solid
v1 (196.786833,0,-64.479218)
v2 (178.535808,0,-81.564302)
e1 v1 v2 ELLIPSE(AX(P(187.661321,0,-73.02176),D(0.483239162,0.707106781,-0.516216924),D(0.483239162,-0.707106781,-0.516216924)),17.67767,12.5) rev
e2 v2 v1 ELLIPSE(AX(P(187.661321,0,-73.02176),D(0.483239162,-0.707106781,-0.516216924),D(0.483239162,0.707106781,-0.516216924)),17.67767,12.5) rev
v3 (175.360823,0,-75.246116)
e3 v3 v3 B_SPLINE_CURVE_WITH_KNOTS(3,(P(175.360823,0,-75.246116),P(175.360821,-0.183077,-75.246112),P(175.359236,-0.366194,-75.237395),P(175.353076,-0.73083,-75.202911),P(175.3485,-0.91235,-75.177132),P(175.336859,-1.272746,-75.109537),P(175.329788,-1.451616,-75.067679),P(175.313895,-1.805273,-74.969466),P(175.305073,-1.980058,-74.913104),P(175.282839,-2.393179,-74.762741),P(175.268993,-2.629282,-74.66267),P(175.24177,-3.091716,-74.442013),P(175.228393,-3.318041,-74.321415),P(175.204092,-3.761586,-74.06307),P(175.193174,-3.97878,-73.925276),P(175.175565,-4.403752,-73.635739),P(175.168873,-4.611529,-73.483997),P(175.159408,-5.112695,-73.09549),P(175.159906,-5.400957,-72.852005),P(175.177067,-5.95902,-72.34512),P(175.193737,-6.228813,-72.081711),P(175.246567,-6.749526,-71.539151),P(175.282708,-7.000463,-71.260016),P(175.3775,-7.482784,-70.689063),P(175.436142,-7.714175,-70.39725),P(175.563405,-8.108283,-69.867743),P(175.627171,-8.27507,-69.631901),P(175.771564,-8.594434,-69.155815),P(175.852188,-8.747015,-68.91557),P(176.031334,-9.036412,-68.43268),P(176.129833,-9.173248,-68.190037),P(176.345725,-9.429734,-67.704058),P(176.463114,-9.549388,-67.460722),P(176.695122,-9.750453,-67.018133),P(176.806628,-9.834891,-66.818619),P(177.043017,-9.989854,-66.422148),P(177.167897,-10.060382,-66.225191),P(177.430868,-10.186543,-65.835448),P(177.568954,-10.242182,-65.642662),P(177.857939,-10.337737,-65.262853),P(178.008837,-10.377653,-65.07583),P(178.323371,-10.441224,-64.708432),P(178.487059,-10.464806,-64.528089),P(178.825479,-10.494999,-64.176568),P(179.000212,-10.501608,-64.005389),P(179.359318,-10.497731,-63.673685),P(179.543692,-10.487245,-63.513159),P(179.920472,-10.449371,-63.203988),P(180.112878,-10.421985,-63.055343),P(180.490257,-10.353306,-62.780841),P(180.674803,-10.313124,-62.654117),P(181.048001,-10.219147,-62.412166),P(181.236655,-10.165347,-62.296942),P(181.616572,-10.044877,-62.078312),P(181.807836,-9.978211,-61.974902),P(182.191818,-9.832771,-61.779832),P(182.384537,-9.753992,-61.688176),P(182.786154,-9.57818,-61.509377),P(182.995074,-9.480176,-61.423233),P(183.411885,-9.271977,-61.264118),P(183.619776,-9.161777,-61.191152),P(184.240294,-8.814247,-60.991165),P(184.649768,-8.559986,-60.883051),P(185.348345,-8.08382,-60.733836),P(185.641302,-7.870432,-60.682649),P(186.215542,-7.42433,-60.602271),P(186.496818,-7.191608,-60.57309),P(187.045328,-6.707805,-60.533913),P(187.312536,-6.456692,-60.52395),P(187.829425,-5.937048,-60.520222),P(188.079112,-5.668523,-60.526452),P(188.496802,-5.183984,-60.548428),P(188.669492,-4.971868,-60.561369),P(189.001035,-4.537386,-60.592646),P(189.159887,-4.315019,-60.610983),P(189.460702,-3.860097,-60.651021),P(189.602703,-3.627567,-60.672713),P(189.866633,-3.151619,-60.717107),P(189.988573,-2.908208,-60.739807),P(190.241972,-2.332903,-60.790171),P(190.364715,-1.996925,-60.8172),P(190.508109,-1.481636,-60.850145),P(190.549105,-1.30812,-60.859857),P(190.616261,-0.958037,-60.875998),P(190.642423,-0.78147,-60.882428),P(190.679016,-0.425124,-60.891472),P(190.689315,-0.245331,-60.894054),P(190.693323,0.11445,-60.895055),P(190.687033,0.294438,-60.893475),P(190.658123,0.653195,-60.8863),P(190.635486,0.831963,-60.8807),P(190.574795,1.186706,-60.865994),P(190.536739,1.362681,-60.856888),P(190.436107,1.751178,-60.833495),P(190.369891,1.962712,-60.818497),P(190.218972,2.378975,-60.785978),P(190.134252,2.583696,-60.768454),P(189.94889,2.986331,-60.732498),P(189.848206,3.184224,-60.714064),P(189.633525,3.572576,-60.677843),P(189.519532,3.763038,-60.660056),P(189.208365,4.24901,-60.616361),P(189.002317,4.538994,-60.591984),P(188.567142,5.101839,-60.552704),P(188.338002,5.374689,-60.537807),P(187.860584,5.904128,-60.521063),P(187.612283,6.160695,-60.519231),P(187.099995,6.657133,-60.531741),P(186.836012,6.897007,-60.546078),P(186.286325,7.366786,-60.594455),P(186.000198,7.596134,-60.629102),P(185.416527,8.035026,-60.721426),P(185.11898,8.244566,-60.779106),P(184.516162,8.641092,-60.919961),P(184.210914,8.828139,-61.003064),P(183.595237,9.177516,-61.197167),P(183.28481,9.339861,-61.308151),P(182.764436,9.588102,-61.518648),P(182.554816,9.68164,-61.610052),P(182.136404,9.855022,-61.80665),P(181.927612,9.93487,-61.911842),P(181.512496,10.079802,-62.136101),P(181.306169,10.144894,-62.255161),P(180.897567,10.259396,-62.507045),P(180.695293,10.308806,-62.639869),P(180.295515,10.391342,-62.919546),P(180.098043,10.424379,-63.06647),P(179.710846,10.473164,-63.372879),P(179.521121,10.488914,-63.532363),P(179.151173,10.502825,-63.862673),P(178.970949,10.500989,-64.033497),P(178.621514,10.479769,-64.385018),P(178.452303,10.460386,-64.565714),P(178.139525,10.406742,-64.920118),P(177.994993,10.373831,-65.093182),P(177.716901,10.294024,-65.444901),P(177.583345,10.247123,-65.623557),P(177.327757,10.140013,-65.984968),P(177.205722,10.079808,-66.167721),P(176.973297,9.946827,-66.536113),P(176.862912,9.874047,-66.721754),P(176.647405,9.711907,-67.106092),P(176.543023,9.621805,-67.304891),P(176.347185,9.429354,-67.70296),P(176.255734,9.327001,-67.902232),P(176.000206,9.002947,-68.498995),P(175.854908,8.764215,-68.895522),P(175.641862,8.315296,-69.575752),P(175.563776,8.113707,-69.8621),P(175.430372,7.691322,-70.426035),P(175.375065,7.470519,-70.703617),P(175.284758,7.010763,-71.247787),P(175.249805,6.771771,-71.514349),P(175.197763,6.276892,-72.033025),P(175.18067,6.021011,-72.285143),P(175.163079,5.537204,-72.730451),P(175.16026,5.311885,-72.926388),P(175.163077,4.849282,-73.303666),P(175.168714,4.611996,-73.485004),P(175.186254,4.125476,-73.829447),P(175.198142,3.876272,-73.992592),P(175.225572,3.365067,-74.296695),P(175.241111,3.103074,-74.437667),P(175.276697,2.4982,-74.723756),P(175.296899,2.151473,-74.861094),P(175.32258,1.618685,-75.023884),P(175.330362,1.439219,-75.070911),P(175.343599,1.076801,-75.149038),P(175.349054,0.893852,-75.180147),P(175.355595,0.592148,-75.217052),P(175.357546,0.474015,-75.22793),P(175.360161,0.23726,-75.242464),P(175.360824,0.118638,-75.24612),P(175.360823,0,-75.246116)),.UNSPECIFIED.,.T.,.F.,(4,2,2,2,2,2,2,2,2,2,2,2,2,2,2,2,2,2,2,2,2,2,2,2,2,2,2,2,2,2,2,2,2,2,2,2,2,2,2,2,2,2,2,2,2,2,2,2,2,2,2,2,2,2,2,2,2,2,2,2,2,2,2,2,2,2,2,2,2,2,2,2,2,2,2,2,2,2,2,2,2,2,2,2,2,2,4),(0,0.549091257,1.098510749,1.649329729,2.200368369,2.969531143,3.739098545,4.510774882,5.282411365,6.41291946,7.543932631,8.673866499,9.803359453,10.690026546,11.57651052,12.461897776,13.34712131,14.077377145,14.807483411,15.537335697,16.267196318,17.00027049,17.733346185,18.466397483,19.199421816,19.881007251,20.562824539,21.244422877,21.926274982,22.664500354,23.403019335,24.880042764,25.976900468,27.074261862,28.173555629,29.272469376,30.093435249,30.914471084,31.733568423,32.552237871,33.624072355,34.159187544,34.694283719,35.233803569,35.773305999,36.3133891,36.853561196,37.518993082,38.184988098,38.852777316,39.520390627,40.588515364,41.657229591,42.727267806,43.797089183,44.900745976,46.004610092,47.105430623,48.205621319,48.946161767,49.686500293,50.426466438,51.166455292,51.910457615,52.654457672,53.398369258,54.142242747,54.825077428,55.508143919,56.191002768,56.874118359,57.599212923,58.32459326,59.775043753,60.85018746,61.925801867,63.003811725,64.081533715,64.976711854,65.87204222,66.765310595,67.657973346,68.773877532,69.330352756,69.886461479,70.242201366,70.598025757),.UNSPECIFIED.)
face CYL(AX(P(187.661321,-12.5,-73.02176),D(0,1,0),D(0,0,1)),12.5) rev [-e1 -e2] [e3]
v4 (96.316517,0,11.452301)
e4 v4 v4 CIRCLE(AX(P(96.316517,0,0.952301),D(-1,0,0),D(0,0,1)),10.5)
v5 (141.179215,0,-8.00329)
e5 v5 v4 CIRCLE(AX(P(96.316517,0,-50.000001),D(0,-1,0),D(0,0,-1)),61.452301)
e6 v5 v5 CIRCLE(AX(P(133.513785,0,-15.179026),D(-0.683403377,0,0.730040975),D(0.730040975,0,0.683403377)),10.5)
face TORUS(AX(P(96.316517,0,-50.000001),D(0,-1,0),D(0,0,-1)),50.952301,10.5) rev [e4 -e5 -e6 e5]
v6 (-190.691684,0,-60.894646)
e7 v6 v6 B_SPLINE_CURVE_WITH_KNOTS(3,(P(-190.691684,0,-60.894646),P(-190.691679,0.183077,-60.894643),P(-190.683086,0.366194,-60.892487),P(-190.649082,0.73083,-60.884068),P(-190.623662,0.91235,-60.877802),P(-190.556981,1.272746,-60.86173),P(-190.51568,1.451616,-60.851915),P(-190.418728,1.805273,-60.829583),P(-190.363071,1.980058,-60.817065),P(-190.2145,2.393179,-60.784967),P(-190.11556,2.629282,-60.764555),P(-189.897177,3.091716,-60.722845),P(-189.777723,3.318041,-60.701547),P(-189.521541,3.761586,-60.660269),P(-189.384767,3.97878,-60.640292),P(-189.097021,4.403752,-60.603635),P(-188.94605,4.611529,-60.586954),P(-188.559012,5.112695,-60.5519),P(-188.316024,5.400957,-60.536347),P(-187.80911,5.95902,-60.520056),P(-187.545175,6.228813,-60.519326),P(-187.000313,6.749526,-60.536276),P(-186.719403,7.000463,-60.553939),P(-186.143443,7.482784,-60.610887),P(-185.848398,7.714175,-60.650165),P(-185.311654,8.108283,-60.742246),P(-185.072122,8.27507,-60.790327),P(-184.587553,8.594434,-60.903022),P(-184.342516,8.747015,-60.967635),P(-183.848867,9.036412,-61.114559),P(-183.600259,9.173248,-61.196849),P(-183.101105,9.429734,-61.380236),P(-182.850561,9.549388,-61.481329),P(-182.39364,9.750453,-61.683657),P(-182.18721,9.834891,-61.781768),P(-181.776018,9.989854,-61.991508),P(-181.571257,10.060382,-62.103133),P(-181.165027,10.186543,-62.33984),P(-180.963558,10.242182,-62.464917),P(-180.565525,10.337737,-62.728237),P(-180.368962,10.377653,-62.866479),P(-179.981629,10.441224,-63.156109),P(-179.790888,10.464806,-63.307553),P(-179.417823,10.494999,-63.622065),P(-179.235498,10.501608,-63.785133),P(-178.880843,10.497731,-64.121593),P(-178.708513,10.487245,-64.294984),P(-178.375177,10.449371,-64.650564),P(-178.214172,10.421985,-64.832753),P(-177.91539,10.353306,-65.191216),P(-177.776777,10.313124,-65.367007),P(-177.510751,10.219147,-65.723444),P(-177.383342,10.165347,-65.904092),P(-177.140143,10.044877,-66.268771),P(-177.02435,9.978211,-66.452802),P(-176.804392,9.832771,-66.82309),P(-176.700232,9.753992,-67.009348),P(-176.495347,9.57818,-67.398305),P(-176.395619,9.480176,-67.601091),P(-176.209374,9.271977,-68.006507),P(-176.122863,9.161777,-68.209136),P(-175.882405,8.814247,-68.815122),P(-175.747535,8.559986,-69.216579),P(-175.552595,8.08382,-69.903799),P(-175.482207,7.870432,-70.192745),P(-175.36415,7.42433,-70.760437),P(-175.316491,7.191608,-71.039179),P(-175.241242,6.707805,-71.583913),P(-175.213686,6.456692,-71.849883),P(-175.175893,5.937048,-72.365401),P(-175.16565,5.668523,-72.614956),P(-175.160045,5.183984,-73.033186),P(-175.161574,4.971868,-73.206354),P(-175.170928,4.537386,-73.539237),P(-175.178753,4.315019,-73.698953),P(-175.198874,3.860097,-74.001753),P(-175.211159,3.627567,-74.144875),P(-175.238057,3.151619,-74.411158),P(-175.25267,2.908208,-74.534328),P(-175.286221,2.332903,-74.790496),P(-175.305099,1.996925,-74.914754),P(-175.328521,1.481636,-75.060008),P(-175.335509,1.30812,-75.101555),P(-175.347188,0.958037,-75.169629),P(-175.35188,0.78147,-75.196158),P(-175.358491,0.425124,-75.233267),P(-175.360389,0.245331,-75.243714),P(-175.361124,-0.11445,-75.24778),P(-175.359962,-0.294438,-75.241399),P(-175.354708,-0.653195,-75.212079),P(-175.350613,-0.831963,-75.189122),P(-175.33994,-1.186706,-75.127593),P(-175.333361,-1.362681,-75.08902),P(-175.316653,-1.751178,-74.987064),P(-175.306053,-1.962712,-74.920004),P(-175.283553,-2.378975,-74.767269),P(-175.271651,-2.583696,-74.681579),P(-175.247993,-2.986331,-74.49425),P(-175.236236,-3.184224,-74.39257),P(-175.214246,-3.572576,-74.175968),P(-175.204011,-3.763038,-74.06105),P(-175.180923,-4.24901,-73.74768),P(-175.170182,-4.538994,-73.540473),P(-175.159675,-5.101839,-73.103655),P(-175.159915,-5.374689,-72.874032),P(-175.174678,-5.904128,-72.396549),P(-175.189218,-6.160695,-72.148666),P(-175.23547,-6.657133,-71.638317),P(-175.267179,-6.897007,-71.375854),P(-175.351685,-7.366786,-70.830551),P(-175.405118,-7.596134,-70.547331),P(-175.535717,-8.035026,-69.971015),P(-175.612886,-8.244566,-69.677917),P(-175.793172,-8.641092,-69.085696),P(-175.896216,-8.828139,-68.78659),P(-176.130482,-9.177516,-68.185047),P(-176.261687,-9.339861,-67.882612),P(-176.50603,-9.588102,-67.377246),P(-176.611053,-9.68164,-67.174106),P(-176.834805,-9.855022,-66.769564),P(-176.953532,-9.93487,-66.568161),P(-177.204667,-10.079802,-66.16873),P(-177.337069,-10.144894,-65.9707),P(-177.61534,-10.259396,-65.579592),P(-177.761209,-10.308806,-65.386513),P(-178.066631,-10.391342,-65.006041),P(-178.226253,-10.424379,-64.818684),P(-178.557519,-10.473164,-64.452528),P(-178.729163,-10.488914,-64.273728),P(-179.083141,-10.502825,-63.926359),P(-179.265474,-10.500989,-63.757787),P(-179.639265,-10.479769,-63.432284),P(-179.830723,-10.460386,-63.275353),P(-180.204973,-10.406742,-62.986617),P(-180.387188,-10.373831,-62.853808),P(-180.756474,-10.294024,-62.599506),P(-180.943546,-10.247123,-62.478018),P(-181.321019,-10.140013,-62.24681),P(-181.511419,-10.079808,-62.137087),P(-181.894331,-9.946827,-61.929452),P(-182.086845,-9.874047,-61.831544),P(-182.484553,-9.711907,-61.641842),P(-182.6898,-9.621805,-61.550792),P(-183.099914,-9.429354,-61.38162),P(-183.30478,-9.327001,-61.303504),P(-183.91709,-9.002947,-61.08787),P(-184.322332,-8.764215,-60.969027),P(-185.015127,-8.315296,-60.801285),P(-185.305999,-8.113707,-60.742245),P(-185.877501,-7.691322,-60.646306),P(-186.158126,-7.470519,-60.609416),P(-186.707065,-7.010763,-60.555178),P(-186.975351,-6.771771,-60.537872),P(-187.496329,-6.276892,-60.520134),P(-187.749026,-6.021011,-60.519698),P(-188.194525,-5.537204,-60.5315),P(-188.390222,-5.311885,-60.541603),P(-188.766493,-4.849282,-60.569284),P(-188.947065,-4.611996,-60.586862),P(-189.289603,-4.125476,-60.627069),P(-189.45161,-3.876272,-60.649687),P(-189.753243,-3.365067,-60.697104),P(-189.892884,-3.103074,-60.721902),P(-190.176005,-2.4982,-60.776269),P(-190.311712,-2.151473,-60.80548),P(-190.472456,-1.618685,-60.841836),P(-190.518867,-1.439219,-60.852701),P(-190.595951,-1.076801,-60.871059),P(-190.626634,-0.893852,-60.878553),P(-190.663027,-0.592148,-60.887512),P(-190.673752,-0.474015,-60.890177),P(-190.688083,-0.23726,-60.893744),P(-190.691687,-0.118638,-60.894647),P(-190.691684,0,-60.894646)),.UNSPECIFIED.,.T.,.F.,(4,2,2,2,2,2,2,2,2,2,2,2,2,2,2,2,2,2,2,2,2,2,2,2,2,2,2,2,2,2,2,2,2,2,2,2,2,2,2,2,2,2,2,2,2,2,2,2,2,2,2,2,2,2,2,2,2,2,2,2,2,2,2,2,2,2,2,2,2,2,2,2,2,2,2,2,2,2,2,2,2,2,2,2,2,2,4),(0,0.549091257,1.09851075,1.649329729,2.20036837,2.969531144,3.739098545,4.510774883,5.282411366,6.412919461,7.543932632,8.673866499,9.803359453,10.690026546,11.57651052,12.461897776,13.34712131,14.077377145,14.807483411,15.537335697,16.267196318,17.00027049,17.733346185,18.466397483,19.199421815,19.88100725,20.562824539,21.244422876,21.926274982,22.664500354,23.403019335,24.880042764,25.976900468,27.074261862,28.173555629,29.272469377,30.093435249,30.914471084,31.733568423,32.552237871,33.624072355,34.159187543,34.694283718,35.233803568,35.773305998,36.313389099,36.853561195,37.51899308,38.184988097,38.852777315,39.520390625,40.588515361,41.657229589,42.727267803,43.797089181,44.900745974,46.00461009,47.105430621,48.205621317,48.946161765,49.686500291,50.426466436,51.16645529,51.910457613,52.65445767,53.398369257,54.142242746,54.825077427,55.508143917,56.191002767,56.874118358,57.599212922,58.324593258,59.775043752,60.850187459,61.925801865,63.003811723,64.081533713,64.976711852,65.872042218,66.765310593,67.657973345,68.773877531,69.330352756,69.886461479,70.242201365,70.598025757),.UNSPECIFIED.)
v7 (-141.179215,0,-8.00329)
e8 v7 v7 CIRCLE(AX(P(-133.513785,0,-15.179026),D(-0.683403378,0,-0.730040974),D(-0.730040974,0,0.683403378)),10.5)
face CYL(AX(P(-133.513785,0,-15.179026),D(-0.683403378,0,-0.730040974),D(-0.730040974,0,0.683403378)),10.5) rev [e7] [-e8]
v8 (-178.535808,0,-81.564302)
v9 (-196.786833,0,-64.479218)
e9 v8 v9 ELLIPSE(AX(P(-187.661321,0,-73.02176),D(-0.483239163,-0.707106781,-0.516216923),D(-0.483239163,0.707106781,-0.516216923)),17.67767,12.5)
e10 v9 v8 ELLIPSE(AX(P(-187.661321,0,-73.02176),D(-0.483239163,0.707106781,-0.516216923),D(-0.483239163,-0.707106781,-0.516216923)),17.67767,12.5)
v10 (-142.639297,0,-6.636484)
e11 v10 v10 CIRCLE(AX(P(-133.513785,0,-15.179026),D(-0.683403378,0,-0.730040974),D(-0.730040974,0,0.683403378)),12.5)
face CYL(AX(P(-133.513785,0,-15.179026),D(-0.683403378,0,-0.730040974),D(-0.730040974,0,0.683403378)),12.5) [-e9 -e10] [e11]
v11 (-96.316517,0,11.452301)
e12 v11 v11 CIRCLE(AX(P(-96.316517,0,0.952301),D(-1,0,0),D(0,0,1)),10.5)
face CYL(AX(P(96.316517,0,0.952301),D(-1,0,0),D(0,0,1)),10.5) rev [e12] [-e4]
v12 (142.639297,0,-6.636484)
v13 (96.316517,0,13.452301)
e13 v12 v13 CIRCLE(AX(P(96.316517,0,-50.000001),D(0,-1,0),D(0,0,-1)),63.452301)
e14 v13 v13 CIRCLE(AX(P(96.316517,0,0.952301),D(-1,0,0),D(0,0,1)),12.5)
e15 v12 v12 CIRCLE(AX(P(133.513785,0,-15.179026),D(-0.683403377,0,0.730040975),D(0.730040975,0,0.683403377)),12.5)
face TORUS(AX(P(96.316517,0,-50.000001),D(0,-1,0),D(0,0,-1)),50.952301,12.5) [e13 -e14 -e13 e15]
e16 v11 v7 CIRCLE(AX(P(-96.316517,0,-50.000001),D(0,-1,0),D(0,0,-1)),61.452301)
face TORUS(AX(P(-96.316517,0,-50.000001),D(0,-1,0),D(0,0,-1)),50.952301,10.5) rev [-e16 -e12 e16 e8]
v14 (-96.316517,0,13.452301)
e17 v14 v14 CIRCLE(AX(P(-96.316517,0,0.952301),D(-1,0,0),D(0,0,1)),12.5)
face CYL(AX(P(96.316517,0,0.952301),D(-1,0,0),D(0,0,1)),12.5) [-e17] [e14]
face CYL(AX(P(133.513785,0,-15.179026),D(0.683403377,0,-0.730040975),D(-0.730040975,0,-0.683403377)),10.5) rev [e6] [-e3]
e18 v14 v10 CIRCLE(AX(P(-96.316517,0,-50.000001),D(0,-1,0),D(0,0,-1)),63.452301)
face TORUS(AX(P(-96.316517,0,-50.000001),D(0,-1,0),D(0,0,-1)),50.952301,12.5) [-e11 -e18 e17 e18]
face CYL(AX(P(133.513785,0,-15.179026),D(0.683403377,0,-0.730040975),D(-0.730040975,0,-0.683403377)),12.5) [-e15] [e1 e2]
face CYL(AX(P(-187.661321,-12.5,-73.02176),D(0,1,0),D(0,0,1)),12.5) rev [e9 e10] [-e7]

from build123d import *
from build123d.topology import SkipClean

# Parameters (mm, degrees)
SKETCH_4_R          = 12.5
SKETCH_4_R_2        = 10.5
CUT_EXTRUDE_START   = -12.5000001
CUT_EXTRUDE_1_DEPTH = 25.0000001


# Read off the part's stored shape, not the designer's step: Вырез-Вытянуть1
with BuildPart() as part:
    # По траектории2: sweep along a path in Эскиз1
    with BuildLine(Plane(origin=(0, 0, 0), x_dir=(1, 0, 0), z_dir=(0, 1, 0))) as sweep_2_path:
        Line((-186.966101695, 73.672565631), (-132.818565926, 15.829831696))
        ThreePointArc((-132.818565926, 15.829831696), (-116.209877383, 4.127849745), (-96.316517235, 5.78e-07))
        Line((-96.316517235, 5.78e-07), (96.316517396, 5.78e-07))
        ThreePointArc((96.316517396, 5.78e-07), (116.209877578, 4.12784976), (132.818566138, 15.829831751))
        Line((132.818566138, 15.829831751), (186.966101695, 73.672565631))
    # Эскиз4 → По траектории2 (sweep)
    with BuildSketch(Plane(origin=(186.966101695, 0, -73.672565631), x_dir=(0.7300409748240902, 0, 0.6834033765485009), z_dir=(-0.6834033765485009, 0, 0.7300409748240902))):
        with Locations((0.952301131, 0)):
            Circle(SKETCH_4_R)
        with Locations((0.952301131, 0)):
            Circle(SKETCH_4_R_2, mode=Mode.SUBTRACT)
    sweep(path=sweep_2_path.line)

    # Вырез-Вытянуть1 outline → Вырез-Вытянуть1 (cut)
    with SkipClean():  # the faces are left unmerged after this step: merging them gives an invalid solid
        with BuildSketch(Plane(origin=(0, 0, 0), x_dir=(1, 0, 0), z_dir=(0, 1, 0)).offset(CUT_EXTRUDE_START)):
            with BuildLine():
                Line((196.786832727, 64.479217615), (178.535808357, 81.564302028))
                ThreePointArc((178.535808357, 81.564302028), (179.118778335, 63.896247636), (196.786832727, 64.479217615))
            make_face()
            with BuildLine():
                Line((-178.535808367, 81.564302042), (-196.786832713, 64.479217601))
                ThreePointArc((-196.786832713, 64.479217601), (-179.11877832, 63.896247649), (-178.535808367, 81.564302042))
            make_face()
        extrude(amount=CUT_EXTRUDE_1_DEPTH, mode=Mode.SUBTRACT)


solid = part.part
